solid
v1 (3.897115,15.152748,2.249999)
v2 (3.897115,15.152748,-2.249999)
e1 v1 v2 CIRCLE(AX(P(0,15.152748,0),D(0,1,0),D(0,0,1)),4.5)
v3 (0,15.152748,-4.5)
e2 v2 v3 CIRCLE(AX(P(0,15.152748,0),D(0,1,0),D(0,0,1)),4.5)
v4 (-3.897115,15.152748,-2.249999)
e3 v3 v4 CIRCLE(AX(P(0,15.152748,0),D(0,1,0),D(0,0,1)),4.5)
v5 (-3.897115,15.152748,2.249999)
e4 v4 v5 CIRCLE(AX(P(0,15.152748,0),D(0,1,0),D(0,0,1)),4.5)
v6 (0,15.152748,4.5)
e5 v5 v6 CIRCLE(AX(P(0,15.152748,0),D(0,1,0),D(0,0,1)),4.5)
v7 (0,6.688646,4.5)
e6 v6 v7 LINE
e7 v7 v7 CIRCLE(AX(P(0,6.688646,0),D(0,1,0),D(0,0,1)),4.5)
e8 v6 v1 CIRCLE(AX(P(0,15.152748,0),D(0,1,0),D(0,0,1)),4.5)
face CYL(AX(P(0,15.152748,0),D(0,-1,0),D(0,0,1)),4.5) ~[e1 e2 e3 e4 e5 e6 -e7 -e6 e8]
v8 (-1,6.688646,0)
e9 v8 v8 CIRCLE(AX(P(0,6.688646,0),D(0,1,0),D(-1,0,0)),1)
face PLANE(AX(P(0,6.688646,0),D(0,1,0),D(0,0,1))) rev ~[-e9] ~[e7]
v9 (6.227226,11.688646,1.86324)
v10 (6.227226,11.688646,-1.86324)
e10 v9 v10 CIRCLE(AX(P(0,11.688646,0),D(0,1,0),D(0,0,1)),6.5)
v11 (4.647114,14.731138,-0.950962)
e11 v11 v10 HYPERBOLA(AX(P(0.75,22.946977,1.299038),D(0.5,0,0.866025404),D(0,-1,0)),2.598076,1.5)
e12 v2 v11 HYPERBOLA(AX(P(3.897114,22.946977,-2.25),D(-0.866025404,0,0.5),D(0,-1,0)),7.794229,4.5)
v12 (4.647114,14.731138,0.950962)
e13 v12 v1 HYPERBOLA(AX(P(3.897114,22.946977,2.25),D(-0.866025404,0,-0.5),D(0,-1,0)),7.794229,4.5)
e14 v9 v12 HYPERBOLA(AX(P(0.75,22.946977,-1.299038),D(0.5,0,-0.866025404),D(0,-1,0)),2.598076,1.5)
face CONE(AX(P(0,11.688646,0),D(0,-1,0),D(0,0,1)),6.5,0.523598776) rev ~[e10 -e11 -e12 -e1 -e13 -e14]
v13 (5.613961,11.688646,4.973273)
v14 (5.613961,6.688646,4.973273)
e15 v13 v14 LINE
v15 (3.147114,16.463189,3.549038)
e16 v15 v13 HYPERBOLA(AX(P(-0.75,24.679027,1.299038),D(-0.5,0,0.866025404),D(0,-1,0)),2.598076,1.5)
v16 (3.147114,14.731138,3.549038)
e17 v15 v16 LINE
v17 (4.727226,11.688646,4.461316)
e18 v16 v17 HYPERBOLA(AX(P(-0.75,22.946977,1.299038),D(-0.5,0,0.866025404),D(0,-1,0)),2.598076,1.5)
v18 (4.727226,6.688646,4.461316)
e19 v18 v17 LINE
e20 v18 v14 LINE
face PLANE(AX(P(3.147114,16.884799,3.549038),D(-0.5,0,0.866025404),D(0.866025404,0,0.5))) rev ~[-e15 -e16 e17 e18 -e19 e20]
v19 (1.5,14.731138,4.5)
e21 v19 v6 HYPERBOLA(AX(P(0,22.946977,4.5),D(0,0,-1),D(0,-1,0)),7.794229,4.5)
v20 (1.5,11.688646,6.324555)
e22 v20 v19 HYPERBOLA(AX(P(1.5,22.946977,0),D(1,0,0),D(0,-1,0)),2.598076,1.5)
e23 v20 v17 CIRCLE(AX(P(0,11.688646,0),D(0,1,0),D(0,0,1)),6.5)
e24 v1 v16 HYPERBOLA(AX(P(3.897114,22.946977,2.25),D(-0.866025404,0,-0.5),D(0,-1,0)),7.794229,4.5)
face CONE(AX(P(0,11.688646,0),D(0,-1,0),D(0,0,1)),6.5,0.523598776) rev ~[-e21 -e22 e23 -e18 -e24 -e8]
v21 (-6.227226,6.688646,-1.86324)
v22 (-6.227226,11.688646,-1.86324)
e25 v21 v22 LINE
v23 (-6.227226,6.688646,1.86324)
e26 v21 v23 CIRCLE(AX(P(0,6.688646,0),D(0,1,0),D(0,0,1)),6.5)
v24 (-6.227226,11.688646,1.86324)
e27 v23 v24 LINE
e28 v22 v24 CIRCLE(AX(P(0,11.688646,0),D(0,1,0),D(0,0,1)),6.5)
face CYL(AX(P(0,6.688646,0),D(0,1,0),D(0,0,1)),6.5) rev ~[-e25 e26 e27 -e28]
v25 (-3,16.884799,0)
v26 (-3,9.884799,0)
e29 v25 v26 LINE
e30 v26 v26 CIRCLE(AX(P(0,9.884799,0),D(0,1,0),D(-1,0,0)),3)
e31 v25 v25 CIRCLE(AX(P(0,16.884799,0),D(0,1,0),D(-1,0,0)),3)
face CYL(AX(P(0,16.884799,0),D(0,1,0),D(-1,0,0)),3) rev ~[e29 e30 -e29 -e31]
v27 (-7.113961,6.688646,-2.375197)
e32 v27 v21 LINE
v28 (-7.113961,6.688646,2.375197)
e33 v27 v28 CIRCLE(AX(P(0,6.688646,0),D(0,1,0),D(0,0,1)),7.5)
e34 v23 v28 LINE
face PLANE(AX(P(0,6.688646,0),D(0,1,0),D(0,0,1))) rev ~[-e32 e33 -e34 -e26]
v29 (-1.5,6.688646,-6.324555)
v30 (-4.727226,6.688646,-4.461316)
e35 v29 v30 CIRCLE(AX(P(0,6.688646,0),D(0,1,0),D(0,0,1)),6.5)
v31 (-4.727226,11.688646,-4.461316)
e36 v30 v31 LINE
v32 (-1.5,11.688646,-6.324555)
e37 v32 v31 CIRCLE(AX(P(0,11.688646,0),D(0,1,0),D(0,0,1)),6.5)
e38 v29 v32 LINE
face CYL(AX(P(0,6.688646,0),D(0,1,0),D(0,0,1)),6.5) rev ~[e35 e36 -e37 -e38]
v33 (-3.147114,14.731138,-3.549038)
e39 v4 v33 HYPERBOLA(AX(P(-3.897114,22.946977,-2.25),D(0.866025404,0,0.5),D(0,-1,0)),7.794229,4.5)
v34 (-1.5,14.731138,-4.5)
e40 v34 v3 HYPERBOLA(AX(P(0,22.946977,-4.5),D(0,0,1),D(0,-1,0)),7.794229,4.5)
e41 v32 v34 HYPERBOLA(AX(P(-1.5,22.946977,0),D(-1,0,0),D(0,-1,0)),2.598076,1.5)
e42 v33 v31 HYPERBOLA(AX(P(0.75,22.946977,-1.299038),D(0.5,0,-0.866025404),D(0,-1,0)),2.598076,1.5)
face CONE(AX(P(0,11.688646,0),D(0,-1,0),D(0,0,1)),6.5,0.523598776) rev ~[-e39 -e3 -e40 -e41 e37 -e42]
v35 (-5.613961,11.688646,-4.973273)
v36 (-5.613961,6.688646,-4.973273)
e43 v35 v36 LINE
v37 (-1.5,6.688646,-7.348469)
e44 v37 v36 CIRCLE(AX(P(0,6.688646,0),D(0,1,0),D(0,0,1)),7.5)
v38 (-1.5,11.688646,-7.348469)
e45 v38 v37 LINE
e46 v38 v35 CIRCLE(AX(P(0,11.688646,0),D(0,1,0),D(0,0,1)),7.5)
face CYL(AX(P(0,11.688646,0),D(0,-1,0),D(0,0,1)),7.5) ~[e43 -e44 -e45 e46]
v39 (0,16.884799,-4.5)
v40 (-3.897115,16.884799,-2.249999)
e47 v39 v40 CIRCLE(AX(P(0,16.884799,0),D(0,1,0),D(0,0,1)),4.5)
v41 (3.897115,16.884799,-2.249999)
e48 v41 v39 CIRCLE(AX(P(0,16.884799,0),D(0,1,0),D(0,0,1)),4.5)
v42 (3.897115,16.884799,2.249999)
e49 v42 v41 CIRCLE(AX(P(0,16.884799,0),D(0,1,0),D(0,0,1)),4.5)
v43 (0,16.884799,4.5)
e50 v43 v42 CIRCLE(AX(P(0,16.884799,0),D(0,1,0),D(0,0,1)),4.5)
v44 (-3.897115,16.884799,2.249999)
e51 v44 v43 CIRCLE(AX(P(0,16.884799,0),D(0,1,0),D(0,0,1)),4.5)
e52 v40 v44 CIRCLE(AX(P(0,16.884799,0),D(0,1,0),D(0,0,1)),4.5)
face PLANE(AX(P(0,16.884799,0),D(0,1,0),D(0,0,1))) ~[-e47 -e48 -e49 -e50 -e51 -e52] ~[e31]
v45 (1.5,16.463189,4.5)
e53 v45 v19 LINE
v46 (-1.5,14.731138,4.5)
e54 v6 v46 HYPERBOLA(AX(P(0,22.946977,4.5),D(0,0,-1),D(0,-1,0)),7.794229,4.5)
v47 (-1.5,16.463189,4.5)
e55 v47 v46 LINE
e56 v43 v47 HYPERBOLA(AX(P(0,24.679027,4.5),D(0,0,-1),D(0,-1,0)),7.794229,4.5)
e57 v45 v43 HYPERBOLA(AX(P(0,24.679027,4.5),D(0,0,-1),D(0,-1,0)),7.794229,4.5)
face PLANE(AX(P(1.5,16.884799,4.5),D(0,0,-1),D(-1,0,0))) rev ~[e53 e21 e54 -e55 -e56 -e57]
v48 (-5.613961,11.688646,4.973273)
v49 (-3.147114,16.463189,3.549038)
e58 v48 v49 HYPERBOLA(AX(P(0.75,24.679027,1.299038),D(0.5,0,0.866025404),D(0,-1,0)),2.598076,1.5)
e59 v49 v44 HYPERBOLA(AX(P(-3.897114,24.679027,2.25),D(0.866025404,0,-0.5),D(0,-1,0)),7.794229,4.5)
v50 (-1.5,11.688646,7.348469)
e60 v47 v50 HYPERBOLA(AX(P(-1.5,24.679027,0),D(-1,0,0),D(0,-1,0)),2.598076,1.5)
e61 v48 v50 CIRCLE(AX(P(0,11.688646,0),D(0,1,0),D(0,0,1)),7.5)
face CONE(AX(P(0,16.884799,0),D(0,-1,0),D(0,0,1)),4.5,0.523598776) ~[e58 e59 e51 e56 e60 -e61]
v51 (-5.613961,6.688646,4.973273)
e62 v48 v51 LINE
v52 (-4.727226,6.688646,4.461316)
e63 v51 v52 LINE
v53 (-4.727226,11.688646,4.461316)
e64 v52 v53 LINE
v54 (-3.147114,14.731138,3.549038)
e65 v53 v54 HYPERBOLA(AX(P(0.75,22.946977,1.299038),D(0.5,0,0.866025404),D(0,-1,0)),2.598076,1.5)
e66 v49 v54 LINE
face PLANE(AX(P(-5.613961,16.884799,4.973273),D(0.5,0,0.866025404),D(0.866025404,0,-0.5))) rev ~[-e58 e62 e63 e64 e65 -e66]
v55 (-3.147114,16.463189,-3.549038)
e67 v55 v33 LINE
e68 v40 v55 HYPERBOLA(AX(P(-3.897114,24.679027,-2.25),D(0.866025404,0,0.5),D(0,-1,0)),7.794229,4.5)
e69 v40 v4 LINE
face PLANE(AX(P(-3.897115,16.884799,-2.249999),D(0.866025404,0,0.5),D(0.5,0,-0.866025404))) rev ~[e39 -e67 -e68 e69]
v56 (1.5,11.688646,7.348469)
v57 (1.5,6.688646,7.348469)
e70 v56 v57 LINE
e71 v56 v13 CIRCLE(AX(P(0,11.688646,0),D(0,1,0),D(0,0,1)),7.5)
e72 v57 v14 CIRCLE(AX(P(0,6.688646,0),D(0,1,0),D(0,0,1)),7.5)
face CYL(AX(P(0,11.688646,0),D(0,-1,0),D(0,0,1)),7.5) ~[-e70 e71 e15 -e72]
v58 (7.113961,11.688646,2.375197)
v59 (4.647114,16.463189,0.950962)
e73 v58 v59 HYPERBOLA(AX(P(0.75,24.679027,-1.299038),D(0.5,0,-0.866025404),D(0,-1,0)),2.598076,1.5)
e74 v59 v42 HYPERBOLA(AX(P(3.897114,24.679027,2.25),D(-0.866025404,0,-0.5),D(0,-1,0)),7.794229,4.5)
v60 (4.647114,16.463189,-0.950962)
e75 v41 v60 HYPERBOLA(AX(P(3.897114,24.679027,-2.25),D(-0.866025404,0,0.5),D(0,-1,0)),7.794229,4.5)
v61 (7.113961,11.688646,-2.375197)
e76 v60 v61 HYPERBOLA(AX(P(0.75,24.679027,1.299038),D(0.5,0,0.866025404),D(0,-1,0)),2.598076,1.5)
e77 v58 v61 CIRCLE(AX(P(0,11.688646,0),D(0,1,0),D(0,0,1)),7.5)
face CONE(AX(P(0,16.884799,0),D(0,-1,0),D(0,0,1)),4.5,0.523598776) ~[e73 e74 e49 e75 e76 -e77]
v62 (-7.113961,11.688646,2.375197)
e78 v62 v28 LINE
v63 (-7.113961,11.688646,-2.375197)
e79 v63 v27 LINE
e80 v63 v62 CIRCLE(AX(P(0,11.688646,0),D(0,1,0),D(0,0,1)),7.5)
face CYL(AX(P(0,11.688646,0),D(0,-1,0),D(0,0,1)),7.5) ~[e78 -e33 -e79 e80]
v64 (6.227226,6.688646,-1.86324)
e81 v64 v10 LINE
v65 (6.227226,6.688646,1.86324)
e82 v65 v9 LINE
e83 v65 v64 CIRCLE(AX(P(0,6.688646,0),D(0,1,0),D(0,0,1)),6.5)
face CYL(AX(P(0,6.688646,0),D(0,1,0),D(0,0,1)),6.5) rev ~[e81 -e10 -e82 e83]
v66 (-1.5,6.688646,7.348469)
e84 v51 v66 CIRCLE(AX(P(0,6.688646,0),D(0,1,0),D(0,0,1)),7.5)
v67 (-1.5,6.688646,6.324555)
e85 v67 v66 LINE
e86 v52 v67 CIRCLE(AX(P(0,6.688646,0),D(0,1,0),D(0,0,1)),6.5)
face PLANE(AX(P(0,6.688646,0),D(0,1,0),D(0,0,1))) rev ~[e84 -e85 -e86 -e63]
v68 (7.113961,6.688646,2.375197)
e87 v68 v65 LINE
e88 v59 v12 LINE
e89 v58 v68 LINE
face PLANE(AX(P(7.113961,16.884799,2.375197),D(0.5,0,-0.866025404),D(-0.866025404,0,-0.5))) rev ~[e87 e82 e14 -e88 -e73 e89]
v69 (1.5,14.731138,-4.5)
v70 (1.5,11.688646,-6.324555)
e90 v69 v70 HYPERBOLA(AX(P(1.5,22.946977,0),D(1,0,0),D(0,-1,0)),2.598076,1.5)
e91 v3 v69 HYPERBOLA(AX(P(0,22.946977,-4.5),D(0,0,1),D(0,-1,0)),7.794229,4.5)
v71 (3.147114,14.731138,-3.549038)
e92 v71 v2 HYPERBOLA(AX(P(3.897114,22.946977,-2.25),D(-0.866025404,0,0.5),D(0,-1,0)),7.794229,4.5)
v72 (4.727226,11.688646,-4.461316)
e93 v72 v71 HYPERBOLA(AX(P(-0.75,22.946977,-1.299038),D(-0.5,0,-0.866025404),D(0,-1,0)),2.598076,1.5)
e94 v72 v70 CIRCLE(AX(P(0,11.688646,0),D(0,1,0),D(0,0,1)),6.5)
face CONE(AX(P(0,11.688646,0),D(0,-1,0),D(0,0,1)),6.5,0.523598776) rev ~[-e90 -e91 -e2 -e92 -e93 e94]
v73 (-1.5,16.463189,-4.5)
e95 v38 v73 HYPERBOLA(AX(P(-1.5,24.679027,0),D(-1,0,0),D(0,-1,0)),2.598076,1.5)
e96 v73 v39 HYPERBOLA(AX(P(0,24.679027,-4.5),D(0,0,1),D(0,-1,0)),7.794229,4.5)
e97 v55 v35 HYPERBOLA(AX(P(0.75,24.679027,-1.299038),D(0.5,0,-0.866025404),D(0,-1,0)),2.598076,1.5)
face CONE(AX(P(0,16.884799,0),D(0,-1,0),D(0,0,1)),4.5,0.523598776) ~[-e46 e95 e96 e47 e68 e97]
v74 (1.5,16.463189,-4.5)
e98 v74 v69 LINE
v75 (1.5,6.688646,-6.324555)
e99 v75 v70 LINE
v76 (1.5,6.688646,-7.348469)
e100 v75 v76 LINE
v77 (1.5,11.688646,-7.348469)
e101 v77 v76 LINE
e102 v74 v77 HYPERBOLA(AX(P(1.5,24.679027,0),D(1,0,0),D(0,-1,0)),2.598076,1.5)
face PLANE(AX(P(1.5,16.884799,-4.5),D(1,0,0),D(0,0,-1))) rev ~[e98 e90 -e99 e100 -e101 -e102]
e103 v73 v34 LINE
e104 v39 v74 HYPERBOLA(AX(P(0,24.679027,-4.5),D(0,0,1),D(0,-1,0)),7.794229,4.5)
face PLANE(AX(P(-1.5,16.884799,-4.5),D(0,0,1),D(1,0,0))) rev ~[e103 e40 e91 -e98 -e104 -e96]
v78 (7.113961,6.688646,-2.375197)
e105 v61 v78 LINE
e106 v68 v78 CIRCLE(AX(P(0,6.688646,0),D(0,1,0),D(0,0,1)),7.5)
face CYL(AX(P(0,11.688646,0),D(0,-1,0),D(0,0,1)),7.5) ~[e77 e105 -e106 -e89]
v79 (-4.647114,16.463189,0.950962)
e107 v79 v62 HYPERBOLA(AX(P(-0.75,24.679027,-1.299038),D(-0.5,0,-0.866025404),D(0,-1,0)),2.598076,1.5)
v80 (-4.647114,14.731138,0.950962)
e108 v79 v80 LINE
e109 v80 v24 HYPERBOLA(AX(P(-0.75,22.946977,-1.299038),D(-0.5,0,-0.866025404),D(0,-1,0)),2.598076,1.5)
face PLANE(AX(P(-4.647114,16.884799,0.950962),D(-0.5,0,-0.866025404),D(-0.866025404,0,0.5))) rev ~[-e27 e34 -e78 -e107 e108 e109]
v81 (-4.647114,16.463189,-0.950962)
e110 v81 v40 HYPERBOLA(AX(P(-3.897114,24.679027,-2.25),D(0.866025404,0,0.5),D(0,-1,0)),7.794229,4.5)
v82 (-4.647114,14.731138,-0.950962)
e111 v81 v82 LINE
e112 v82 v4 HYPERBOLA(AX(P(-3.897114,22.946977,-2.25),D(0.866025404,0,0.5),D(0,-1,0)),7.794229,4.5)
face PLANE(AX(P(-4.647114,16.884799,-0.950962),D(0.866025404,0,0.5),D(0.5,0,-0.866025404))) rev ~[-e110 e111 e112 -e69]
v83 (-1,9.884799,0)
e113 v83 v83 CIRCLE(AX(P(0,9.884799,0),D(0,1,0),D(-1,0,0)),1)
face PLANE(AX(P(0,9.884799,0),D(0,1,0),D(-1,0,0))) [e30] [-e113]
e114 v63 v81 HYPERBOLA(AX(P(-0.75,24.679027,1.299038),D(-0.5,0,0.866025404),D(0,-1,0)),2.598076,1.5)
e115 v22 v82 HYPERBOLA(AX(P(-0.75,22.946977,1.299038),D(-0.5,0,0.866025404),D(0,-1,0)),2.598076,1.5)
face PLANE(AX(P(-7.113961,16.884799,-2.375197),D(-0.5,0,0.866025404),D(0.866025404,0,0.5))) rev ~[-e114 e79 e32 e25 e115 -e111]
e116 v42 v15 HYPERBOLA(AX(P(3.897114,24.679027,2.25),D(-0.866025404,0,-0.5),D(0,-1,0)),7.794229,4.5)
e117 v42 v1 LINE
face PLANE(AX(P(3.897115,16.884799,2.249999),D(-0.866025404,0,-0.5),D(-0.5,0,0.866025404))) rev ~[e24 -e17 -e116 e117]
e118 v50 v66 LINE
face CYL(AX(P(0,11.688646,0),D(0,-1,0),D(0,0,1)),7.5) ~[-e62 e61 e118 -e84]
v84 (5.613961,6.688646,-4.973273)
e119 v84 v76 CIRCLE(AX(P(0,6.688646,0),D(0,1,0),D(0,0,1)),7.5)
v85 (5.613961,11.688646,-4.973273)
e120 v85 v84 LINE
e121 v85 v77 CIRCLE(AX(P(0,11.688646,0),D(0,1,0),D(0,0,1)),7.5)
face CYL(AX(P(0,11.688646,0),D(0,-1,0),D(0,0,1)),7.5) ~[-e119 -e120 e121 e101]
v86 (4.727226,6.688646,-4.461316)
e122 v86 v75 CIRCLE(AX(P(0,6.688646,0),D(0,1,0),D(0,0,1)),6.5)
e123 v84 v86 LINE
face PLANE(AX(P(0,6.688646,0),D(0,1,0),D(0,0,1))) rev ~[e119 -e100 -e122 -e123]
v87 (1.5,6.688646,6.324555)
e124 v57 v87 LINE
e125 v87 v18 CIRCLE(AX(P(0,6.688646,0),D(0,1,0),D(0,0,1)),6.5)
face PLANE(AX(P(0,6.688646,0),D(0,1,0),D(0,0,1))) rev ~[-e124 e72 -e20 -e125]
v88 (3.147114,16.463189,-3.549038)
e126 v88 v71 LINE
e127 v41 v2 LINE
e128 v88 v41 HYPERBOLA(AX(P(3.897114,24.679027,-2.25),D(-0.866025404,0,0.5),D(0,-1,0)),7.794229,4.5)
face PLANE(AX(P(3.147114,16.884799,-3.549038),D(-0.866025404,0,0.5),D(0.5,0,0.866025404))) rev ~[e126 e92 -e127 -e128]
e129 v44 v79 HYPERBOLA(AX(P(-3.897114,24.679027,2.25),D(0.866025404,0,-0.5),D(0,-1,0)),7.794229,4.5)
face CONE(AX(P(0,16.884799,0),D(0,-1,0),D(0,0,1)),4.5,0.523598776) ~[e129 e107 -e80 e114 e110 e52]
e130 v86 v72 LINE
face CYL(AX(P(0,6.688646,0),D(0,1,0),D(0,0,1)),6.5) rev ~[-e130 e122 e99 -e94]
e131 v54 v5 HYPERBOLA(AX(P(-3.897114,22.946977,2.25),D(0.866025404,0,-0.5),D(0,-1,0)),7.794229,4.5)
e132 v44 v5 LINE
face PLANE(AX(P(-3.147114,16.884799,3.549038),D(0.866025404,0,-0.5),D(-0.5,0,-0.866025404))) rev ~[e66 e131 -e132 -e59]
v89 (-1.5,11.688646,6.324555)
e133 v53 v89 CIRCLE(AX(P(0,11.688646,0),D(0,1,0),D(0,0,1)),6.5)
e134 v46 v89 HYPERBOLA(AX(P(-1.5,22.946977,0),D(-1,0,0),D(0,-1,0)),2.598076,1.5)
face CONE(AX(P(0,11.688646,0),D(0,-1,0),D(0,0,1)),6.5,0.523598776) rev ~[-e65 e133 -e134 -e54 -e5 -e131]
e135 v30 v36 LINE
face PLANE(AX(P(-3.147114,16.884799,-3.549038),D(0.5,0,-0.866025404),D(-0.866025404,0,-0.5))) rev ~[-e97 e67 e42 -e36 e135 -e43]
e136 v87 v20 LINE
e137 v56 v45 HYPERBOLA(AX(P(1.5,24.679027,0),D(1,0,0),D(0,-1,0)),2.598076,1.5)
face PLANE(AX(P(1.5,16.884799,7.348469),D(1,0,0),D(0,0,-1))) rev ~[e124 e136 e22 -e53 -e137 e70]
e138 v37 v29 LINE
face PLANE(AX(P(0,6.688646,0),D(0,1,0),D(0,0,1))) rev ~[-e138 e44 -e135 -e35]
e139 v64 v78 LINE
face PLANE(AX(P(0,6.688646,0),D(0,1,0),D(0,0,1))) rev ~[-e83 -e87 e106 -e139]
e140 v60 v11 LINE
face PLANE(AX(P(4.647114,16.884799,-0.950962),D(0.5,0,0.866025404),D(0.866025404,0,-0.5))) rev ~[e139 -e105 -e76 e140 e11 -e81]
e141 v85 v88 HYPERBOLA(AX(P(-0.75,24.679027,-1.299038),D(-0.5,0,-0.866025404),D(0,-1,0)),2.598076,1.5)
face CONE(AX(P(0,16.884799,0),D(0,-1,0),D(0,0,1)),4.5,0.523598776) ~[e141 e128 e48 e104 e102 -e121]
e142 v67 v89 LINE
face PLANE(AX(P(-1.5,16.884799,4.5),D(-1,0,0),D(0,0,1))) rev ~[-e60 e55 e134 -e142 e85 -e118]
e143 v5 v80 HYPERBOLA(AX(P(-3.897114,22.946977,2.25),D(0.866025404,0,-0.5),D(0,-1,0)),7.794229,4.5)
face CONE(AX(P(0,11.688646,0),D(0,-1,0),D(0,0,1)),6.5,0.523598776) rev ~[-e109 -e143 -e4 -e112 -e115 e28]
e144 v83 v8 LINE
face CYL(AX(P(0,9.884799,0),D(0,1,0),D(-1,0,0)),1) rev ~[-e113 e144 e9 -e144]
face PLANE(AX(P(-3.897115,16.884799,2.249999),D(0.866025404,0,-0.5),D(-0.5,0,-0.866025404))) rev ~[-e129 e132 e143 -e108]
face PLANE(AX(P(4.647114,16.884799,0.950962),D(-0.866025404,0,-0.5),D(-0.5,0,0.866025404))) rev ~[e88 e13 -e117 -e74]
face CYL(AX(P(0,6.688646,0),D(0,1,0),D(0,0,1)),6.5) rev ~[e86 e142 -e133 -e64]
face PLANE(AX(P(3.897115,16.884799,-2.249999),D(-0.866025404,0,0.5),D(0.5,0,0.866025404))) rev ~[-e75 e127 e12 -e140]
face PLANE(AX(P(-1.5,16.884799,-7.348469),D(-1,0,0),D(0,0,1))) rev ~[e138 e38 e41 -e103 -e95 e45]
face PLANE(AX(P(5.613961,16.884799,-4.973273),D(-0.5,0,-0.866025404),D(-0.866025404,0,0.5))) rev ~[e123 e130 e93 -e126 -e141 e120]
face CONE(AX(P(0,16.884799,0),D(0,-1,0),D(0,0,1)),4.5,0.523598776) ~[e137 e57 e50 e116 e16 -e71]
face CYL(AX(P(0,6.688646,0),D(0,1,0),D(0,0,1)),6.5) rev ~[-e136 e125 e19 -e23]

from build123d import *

# Parameters (mm, degrees)
F3_DEPTH = 25
F4_R     = 3
F5_DEPTH = 7
F6_R     = 1
F7_DEPTH = 25


# Not quite as in the source:
# - a feature names something its author has since deleted; it is built from what else it names


with BuildPart() as f1:
    # F0 (on Right) → F1 (revolve)
    with BuildSketch(Plane.YZ):
        Polygon((6.6886462844, 0), (16.8847987071, 0), (16.8847987071, 4.5), (11.6886462844, 7.5), (6.6886462844, 7.5), (6.6886462844, 6.5), (11.6886462844, 6.5), (15.1527478995, 4.5), (6.6886462844, 4.5), align=None)
    revolve(axis=Axis((0, 8.4423993535, 0), (0, 1, 0)))

    # F2 (on face) → F3 (cut)
    with BuildSketch(Plane(origin=(0, 16.8847987071, 0), x_dir=(-1, 0, 0), z_dir=(0, 1, 0))):
        with BuildLine():
            ThreePointArc((-7.1139610307, -2.3751965085), (-6.4951905284, -3.75), (-5.6139610307, -4.9732727199))
            Line((-5.6139610307, -4.9732727199), (-3.147114317, -3.5490381057))
            Line((-3.147114317, -3.5490381057), (-3.8971148018, -2.2499991604))
            Line((-3.8971148018, -2.2499991604), (-4.647114317, -0.9509618943))
            Line((-4.647114317, -0.9509618943), (-7.1139610307, -2.3751965085))
        make_face()
        with BuildLine():
            Line((-3.147114317, 3.5490381057), (-5.6139610307, 4.9732727199))
            ThreePointArc((-5.6139610307, 4.9732727199), (-6.4951905284, 3.75), (-7.1139610307, 2.3751965085))
            Line((-7.1139610307, 2.3751965085), (-4.647114317, 0.9509618943))
            Line((-4.647114317, 0.9509618943), (-3.8971148073, 2.2499991508))
            Line((-3.8971148073, 2.2499991508), (-3.147114317, 3.5490381057))
        make_face()
        with BuildLine():
            Line((1.5, 4.5), (1.5, 7.3484692283))
            ThreePointArc((1.5, 7.3484692283), (0, 7.5), (-1.5, 7.3484692283))
            Line((-1.5, 7.3484692283), (-1.5, 4.5))
            Line((-1.5, 4.5), (0, 4.5))
            Line((0, 4.5), (1.5, 4.5))
        make_face()
        with BuildLine():
            Line((4.647114317, 0.9509618943), (7.1139610307, 2.3751965085))
            ThreePointArc((7.1139610307, 2.3751965085), (6.4951905284, 3.75), (5.6139610307, 4.9732727199))
            Line((5.6139610307, 4.9732727199), (3.147114317, 3.5490381057))
            Line((3.147114317, 3.5490381057), (3.8971147984, 2.2499991663))
            Line((3.8971147984, 2.2499991663), (4.647114317, 0.9509618943))
        make_face()
        with BuildLine():
            ThreePointArc((5.6139610307, -4.9732727199), (6.4951905284, -3.75), (7.1139610307, -2.3751965085))
            Line((7.1139610307, -2.3751965085), (4.647114317, -0.9509618943))
            Line((4.647114317, -0.9509618943), (3.8971147929, -2.2499991758))
            Line((3.8971147929, -2.2499991758), (3.147114317, -3.5490381057))
            Line((3.147114317, -3.5490381057), (5.6139610307, -4.9732727199))
        make_face()
        with BuildLine():
            ThreePointArc((-1.5, -7.3484692283), (0, -7.5), (1.5, -7.3484692283))
            Line((1.5, -7.3484692283), (1.5, -4.5))
            Line((1.5, -4.5), (0, -4.5))
            Line((0, -4.5), (-1.5, -4.5))
            Line((-1.5, -4.5), (-1.5, -7.3484692283))
        make_face()
    extrude(amount=-F3_DEPTH, mode=Mode.SUBTRACT)

    # F4 (on face) → F5 (cut)
    with BuildSketch(Plane(origin=(0, 16.8847987071, 0), x_dir=(-1, 0, 0), z_dir=(0, 1, 0))):
        Circle(F4_R)
    extrude(amount=-F5_DEPTH, mode=Mode.SUBTRACT)

    # F6 (on face) → F7 (cut)
    with BuildSketch(Plane(origin=(0, 9.8847987071, 0), x_dir=(-1, 0, 0), z_dir=(0, 1, 0))):
        Circle(F6_R)
    extrude(amount=-F7_DEPTH, mode=Mode.SUBTRACT)


solid = f1.part
